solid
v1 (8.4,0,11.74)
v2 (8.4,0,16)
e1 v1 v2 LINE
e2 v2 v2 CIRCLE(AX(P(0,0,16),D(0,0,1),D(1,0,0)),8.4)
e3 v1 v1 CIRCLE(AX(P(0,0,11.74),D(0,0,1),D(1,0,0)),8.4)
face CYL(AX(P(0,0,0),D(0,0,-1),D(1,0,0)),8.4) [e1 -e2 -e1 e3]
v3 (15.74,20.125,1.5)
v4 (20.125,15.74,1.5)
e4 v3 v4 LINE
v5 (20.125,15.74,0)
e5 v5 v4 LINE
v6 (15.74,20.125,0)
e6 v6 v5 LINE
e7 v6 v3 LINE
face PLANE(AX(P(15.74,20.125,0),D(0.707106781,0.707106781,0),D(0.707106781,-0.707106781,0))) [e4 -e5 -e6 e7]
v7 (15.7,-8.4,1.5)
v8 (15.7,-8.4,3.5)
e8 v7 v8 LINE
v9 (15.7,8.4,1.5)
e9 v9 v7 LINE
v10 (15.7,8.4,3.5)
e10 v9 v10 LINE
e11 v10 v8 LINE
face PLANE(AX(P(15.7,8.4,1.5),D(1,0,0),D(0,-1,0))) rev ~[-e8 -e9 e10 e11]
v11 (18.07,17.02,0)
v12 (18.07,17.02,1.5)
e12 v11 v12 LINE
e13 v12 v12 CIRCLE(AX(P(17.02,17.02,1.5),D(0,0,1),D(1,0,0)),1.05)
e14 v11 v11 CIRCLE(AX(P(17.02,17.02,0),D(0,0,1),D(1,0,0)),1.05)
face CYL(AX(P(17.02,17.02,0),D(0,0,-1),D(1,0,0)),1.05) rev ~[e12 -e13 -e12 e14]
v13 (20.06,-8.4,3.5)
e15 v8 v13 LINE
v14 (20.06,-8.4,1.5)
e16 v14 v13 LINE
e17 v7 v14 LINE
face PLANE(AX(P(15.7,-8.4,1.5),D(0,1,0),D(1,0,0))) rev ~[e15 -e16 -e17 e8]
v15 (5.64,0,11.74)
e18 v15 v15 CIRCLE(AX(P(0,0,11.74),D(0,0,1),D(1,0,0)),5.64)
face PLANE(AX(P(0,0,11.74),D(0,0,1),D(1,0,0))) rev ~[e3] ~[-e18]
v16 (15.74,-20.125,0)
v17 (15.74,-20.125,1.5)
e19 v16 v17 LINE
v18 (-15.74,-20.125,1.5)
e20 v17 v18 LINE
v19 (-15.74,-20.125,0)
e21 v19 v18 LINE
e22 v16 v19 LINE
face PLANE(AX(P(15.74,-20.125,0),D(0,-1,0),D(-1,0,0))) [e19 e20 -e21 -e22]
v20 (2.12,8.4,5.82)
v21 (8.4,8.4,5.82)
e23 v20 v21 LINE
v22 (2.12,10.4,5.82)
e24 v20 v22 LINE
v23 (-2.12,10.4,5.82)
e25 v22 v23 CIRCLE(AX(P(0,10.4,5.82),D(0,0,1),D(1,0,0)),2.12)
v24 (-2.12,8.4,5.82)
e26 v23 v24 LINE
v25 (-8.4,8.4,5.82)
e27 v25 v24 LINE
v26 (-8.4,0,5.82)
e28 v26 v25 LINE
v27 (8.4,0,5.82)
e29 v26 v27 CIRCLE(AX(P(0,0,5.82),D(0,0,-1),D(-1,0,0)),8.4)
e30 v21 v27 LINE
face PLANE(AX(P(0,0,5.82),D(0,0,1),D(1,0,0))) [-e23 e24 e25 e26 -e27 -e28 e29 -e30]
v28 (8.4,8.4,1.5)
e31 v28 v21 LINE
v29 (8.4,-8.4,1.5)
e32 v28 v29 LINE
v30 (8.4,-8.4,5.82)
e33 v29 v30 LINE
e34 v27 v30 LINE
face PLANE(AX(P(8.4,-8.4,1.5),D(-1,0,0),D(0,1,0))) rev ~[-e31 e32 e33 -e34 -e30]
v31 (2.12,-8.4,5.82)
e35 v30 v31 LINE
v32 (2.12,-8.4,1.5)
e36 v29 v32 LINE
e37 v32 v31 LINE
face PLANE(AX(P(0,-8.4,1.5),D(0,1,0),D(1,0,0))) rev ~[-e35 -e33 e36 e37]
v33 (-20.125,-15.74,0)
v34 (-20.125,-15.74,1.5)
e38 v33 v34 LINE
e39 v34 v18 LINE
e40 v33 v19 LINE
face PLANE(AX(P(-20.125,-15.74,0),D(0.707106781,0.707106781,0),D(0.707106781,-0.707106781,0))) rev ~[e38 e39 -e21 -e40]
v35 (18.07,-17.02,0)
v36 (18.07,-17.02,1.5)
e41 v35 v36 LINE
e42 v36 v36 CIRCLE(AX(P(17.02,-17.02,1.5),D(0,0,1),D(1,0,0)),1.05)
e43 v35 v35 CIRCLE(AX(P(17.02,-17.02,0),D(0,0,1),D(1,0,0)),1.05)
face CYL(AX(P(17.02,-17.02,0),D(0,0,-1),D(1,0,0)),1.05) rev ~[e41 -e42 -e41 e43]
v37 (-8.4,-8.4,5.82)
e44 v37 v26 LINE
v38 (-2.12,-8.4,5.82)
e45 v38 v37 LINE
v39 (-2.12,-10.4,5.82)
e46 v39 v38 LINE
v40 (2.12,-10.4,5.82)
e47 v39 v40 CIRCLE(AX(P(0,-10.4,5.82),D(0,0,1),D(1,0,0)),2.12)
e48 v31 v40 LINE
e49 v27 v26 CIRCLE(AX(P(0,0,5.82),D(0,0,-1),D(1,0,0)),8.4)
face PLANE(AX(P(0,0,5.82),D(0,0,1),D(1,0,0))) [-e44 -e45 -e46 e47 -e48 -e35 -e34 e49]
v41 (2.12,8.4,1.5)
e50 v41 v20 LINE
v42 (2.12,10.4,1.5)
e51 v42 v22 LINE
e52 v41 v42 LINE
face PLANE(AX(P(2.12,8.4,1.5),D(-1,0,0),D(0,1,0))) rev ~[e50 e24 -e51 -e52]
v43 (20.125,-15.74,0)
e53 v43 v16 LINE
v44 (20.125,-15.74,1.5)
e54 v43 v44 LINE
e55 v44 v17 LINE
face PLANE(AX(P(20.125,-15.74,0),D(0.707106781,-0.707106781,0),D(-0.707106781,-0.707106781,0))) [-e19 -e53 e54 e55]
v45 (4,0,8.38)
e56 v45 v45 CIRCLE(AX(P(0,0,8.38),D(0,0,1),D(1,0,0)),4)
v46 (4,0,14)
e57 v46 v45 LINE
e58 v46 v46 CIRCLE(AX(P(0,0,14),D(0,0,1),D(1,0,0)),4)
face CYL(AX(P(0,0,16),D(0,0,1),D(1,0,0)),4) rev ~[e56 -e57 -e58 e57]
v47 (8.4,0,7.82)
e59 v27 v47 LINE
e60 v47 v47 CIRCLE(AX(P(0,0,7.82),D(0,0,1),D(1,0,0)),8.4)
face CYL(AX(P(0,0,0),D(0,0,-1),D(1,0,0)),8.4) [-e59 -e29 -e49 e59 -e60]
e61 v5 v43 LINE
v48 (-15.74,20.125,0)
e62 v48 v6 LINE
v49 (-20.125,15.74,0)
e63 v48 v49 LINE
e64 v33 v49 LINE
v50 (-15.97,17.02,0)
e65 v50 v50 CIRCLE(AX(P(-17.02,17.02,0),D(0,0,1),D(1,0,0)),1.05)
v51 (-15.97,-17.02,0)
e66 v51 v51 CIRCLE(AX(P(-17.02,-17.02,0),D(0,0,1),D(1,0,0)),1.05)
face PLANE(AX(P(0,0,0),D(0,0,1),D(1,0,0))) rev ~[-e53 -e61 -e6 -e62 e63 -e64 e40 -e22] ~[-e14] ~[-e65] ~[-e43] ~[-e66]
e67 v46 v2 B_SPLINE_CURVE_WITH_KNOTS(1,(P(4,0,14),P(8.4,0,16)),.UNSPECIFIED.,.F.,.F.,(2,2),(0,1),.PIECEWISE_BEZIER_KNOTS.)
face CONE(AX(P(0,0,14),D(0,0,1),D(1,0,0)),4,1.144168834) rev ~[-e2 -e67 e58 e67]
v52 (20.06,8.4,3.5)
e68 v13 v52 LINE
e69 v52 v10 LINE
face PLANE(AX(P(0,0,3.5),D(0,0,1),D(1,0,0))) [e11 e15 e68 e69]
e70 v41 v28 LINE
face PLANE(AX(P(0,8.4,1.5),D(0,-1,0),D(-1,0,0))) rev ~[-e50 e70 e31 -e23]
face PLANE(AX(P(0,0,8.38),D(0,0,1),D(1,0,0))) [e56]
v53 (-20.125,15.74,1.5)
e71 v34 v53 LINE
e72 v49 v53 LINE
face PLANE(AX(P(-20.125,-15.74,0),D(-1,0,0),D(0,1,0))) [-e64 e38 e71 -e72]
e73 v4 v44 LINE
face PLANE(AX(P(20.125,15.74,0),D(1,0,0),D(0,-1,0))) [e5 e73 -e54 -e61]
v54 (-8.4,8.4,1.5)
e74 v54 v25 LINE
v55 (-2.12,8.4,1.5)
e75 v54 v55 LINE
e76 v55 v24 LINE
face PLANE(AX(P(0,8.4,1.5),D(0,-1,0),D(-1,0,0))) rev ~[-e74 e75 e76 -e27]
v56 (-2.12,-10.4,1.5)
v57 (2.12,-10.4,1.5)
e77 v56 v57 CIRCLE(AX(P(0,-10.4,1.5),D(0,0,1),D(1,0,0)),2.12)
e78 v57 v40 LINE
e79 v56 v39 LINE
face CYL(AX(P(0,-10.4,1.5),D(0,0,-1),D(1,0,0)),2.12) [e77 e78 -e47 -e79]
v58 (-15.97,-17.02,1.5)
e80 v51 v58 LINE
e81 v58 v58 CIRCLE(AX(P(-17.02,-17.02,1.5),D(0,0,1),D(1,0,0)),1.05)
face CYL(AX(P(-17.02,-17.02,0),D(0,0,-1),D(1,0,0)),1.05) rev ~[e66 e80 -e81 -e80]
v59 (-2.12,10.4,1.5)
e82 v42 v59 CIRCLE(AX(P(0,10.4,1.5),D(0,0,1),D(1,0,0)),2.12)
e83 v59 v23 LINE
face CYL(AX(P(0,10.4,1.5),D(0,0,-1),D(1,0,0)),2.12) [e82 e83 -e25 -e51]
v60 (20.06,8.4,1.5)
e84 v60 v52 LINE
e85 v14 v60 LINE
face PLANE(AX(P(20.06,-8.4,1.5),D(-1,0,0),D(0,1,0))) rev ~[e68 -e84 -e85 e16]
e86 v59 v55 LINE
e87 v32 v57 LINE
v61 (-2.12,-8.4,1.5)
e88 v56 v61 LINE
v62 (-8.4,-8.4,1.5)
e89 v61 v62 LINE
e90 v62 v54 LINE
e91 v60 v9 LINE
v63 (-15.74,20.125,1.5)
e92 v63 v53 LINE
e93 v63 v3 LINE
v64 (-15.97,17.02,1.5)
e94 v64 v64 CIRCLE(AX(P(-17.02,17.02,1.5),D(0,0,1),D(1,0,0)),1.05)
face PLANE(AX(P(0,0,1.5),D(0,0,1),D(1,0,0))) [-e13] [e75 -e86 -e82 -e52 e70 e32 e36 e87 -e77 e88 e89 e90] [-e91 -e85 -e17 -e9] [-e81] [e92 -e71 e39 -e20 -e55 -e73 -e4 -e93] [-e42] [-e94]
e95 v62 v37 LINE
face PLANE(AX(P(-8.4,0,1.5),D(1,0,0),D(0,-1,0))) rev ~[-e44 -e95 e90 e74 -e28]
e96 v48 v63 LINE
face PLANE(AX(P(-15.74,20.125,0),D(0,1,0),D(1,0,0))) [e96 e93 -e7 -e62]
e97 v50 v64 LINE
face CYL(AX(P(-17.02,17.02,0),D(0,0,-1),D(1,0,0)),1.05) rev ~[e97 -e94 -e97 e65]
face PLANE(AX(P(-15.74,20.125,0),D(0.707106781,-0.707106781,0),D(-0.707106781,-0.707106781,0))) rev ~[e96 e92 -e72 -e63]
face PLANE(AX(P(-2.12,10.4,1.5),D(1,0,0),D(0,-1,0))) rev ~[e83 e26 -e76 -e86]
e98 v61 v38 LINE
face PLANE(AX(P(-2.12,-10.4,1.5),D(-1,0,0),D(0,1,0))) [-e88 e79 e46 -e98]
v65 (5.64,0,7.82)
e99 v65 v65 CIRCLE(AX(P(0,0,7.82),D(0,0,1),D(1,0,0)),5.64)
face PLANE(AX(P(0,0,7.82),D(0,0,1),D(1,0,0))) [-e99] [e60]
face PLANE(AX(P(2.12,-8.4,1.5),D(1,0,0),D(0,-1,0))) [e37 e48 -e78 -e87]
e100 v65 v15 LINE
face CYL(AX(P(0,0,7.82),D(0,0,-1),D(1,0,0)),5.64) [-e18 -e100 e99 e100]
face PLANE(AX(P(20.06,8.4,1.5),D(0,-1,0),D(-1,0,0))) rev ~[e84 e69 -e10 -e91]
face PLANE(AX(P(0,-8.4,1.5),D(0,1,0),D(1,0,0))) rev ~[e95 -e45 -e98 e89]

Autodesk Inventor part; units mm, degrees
sketch "Base" plane through (0, 0, 0) normal (0, 0, 1) x (1, 0, 0)
  line L0 (-20.125, 20.125) -> (20.125, 20.125)
  line L1 (20.125, 20.125) -> (20.125, -20.125)
  line L2 (20.125, -20.125) -> (-20.125, -20.125)
  line L3 (-20.125, -20.125) -> (-20.125, 20.125)
  line L4 (-15.74, 20.125) -> (-20.125, 15.74)
  line L5 (15.74, 20.125) -> (20.125, 15.74)
  line L6 (-17.02, 17.02) -> (17.02, 17.02) construction
  line L7 (17.02, 17.02) -> (17.02, -17.02) construction
  line L8 (17.02, -17.02) -> (-17.02, -17.02) construction
  line L9 (-17.02, -17.02) -> (-17.02, 17.02) construction
  line L10 (-17.02, 17.02) -> (17.02, -17.02) construction
  line L11 (17.02, 17.02) -> (-17.02, -17.02) construction
  circle A0 centre (0, 0) radius 8.4
  circle A1 centre (17.02, 17.02) radius 1.05
  circle A2 centre (-17.02, 17.02) radius 1.05
  circle A3 centre (-17.02, -17.02) radius 1.05
  circle A4 centre (17.02, -17.02) radius 1.05
  line L12 (-20.125, -15.74) -> (-15.74, -20.125)
  line L13 (20.125, -15.74) -> (15.74, -20.125)
  point P0 (0, 0)
  point P1 (0, 0)
  dimension "d0" = 40.25
  dimension "d1" = 40.25
  dimension "d2" = 135
  dimension "d3" = 135
  dimension "d4" = 31.48
  dimension "d5" = 34.04
  dimension "d6" = 3.105
  dimension "d7" = 3.105
  dimension "d8" = 3.105
  dimension "d9" = 3.105
  dimension "d10" = 16.8
  dimension "d11" = 2.1
  dimension "d12" = 135
  dimension "d13" = 135
  dimension "d14" = 31.48
  dimension "d15" = 34.04
  dimension "d16" = 31.48
extrude "BaseFeature" add sketch "Base" along normal blind 1.5 contours L0 L5 L1 L13 L2 L12 L3 L4 | A0
extrude "CameraFeature" add sketch "Base" along normal blind 16 contours A0
sketch "Sketch2" plane through (0, 0, 16) normal (0, 0, 1) x (1, 0, 0)
  circle A0 centre (0, 0) radius 8.4 projected
  circle A1 centre (0, 0) radius 4
  point P0 (0, 0)
  dimension "d28" = 8
extrude "Extrusion3" cut sketch "Sketch2" against normal blind 7.62 contours A1
sketch "Sketch4" plane through (0, 0, 1.5) normal (0, 0, 1) x (1, 0, 0)
  circle A0 centre (0, 0) radius 4 projected
  circle A1 centre (0, 0) radius 8.4 projected
  line L0 (-8.4, -8.4) -> (8.4, -8.4)
  line L1 (8.4, -8.4) -> (8.4, 8.4)
  line L2 (8.4, 8.4) -> (-8.4, 8.4)
  line L3 (-8.4, 8.4) -> (-8.4, -8.4)
  circle A2 centre (0, 0) radius 8.4 projected
  point P0 (0, 0)
extrude "Extrusion5" add sketch "Sketch4" along normal blind 4.32 contours A0 | A1 | L1 L0 A1 | A1 L2 L1 | A1 L3 L2 | L0 L3 A1
ref_plane "Work Plane1" through (0, 0, 7.82) normal (0, 0, 1) x (1, 0, 0)
ref_plane "Work Plane2" through (0, 0, 11.74) normal (0, 0, 1) x (1, 0, 0)
sketch "Sketch5" plane through (0, 0, 7.82) normal (0, 0, 1) x (1, 0, 0)
  circle A0 centre (0, 0) radius 8.4 projected
  circle A1 centre (0, 0) radius 5.64
  point P0 (0, 0)
  dimension "d33" = 11.28
extrude "Extrusion6" cut sketch "Sketch5" along normal up to surface (3.92 mm away)
ref_plane "Work Plane3" through (0, 0, 14) normal (0, 0, 1) x (1, 0, 0)
sketch "Sketch6" plane through (0, 0, 16) normal (0, 0, 1) x (1, 0, 0)
  circle A0 centre (0, 0) radius 8.4 projected
  point P0 (0, 0)
sketch "Sketch7" plane through (0, 0, 14) normal (0, 0, 1) x (1, 0, 0)
  circle A0 centre (0, 0) radius 4 projected
  point P0 (0, 0)
loft "Loft1" cut profiles "Sketch7" section 2 edges at (-8.4, 0, 16)
sketch "Sketch8" plane through (0, 0, 1.5) normal (0, 0, 1) x (1, 0, 0)
  line L0 (8.4, 8.4) -> (0, 8.4) projected
  line L1 (0, 8.4) -> (-8.4, 8.4) projected
  line L2 (0, -8.4) -> (8.4, -8.4) projected
  line L3 (-8.4, -8.4) -> (0, -8.4) projected
  line L4 (15.74, 20.125) -> (-15.74, 20.125) construction
  line L5 (0, 20.125) -> (0, 8.4) construction
  line L6 (0, -8.4) -> (0, -20.125) construction
  line L7 (-15.74, -20.125) -> (15.74, -20.125) construction
  circle A0 centre (0, 10.4) radius 2.12
  line L8 (2.12, 10.4) -> (-2.12, 10.4) construction
  line L9 (-2.12, 10.4) -> (-2.12, 8.4)
  line L10 (-2.12, 8.4) -> (2.12, 8.4)
  line L11 (2.12, 8.4) -> (2.12, 10.4)
  line L12 (-28.175, 0) -> (28.175, 0) projected
  circle A1 centre (0, -10.4) radius 2.12
  line L13 (-2.12, -10.4) -> (-2.12, -8.4)
  line L14 (-2.12, -8.4) -> (2.12, -8.4)
  line L15 (2.12, -8.4) -> (2.12, -10.4)
  point P0 (0, 0)
  dimension "d41" = 4.24
  dimension "d42" = 2
extrude "Extrusion7" add sketch "Sketch8" along normal blind 4.32 contours L0 A0 L11 | L0 L1 A0 | L1 L9 A0 | L2 A1 L3 | L2 L15 A1 | A1 L13 L3 picked at (0, 11.1364) picked at (0, -11.1364)
sketch "Sketch9" plane through (0, 0, 1.5) normal (0, 0, 1) x (1, 0, 0)
  line L0 (20.06, 8.4) -> (15.7, 8.4)
  line L1 (15.7, 8.4) -> (15.7, -8.4)
  line L2 (15.7, -8.4) -> (20.06, -8.4)
  line L3 (20.06, -8.4) -> (20.06, 8.4)
  line L4 (8.4, 8.4) -> (2.12, 8.4) projected
  line L5 (2.12, -8.4) -> (8.4, -8.4) projected
  line L6 (8.4, -8.4) -> (8.4, 0) projected
  point P0 (0, 0)
  dimension "d45" = 4.36
  dimension "d46" = 7.3
extrude "Extrusion8" add sketch "Sketch9" along normal blind 2
equation "\"d1\" = d0"
equation "\"d3\" = d2"
equation "\"d7\" = d6"
equation "\"d9\" = d8"
equation "\"d12\" = d2"
equation "\"d13\" = d2"
equation "\"d14\" = d4"
properties part number "Arducam"
